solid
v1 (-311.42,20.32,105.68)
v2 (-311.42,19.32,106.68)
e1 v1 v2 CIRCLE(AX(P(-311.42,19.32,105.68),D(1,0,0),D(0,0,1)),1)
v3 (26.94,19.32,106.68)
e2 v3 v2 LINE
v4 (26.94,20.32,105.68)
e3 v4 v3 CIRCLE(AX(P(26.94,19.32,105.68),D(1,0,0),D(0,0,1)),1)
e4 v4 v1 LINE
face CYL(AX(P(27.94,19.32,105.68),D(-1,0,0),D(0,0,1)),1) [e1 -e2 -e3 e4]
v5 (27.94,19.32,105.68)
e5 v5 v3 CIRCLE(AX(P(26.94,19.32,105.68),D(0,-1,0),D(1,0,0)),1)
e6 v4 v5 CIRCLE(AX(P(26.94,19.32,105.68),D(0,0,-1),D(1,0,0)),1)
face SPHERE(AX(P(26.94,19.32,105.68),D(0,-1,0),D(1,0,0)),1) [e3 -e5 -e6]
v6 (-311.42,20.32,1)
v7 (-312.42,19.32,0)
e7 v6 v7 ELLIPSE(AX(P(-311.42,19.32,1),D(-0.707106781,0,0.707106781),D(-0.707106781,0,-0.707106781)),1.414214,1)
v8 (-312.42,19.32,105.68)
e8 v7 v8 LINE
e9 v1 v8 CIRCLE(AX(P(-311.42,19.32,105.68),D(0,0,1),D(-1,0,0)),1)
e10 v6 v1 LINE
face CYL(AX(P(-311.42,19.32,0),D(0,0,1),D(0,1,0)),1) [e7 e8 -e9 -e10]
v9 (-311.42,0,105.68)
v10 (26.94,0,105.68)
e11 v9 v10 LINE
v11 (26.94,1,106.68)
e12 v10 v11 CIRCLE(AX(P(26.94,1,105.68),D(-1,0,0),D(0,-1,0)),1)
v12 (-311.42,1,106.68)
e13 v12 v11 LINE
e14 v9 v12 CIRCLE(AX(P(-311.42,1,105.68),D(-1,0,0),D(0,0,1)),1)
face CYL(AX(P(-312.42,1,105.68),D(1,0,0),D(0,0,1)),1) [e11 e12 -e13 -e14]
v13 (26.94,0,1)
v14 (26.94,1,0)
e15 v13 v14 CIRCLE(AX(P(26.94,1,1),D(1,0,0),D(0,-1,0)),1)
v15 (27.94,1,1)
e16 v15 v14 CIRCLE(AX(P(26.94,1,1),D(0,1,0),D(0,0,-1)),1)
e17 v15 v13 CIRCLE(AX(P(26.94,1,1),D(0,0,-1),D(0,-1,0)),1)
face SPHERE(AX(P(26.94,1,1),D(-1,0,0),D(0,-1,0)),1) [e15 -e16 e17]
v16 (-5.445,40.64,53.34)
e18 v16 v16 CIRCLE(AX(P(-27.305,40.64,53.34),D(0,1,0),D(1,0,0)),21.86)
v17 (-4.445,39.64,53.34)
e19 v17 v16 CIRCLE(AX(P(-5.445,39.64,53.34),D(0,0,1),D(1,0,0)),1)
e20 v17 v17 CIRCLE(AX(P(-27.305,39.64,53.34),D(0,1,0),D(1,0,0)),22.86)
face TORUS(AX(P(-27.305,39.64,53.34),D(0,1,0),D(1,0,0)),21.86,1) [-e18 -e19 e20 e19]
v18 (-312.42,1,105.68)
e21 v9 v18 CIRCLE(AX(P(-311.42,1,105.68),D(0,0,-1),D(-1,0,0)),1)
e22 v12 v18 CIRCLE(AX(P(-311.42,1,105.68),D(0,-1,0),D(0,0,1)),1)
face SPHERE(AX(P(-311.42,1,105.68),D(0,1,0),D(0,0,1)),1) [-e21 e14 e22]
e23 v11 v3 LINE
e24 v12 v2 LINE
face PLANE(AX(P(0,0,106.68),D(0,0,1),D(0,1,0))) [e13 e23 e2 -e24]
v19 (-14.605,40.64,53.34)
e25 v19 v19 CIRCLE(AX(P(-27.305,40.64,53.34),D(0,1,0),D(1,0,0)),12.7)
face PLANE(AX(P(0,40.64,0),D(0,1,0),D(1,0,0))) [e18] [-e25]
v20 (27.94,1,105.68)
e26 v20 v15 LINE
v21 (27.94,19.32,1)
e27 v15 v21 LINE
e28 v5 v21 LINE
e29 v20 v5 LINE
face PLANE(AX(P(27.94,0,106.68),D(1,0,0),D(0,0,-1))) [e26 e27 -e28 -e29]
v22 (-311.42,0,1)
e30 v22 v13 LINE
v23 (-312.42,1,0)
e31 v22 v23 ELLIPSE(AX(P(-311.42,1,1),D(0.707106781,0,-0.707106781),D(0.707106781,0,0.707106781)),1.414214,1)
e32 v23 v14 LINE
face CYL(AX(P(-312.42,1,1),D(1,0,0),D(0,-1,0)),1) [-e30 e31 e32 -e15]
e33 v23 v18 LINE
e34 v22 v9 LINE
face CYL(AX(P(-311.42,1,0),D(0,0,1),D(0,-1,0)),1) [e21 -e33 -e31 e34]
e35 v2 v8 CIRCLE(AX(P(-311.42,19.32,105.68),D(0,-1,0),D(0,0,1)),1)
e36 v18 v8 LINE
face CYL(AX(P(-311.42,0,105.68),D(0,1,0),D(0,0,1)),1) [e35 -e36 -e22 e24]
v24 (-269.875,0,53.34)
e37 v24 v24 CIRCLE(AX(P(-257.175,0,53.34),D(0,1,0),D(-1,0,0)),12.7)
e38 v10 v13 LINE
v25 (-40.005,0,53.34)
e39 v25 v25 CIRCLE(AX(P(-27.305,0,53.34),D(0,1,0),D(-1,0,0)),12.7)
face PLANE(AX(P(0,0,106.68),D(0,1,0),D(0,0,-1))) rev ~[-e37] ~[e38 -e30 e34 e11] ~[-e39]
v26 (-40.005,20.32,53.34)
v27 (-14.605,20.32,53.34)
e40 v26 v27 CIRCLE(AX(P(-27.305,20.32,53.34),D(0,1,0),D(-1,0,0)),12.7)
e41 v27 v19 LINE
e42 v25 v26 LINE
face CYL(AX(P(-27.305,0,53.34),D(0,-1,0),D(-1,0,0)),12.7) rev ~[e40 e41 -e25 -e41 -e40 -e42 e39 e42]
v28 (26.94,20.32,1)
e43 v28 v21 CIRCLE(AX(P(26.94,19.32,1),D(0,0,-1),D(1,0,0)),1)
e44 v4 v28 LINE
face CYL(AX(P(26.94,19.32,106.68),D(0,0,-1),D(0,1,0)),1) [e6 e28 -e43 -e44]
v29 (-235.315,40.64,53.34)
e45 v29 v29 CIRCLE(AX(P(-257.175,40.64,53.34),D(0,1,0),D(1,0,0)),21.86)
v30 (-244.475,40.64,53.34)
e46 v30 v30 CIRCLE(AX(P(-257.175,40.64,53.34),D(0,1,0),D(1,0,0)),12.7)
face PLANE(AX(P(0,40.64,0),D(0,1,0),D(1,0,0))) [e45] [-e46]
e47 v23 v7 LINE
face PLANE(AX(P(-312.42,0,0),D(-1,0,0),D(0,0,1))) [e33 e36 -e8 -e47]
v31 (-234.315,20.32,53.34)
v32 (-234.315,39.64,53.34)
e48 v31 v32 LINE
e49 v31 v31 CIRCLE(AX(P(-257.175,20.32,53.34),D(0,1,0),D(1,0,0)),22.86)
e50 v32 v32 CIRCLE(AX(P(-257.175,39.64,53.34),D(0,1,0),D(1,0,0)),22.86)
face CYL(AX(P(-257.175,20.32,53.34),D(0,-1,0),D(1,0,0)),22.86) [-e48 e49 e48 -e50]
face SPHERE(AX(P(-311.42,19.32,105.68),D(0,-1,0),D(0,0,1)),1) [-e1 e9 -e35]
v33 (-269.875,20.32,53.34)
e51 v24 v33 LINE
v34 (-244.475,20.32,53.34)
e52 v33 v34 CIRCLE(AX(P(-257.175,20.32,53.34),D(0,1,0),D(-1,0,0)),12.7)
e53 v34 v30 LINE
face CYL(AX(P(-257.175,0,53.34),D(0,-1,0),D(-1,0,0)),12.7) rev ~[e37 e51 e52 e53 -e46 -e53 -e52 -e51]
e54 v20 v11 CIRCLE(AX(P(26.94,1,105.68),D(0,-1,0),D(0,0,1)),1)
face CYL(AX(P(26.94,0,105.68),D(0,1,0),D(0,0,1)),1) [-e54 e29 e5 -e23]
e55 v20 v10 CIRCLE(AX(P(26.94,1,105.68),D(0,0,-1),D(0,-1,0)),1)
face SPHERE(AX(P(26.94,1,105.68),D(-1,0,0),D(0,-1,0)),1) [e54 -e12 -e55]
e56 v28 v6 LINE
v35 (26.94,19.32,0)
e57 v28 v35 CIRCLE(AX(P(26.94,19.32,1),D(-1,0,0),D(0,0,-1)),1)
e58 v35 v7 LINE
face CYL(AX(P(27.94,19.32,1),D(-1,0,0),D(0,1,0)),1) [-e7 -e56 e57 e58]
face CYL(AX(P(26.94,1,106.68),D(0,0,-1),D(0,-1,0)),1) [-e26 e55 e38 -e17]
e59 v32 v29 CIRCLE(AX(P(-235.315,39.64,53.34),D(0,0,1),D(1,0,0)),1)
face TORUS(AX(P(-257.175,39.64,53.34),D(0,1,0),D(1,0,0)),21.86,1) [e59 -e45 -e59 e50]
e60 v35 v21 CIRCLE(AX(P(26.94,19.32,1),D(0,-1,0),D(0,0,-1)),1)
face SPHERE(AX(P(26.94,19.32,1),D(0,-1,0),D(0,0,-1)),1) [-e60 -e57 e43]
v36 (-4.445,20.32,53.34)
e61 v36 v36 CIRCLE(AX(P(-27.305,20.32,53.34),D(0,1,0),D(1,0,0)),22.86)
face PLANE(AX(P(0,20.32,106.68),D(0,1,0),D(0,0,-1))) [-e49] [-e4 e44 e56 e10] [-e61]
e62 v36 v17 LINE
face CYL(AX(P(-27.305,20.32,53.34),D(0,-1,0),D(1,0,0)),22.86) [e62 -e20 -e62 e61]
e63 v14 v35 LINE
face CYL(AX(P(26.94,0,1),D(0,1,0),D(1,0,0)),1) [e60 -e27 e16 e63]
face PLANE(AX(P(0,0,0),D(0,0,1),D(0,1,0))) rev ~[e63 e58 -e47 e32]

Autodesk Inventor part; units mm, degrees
ref_plane "YZ Plane" through (0, 0, 0) normal (1, 0, 0) x (0, 1, 0)
ref_plane "XZ Plane" through (0, 0, 0) normal (0, 1, 0) x (-1, 0, 0)
ref_plane "XY Plane" through (0, 0, 0) normal (0, 0, 1) x (1, 0, 0)
sketch "Sketch1" plane through (0, 0, 0) normal (0, 1, 0) x (-1, 0, 0)
  line L0 (0, 0) -> (284.48, 0)
  line L1 (284.48, 0) -> (284.48, 106.68)
  line L2 (284.48, 106.68) -> (0, 106.68)
  line L3 (0, 106.68) -> (0, 0)
  line L4 (0, 53.34) -> (27.305, 53.34) construction
  line L5 (284.48, 53.34) -> (257.175, 53.34) construction
  circle A0 centre (27.305, 53.34) radius 12.7
  circle A1 centre (257.175, 53.34) radius 12.7
  dimension "d0" = 284.48
  dimension "d1" = 106.68
  dimension "d2" = 27.305
  dimension "d3" = 27.305
  dimension "d4" = 25.4
  dimension "d5" = 25.4
extrude "Extrusion1" add sketch "Sketch1" along normal blind 20.32
sketch "Sketch2" plane through (0, 20.32, 0) normal (0, 1, 0) x (1, 0, 0)
  circle A0 centre (-257.175, -53.34) radius 12.7 projected
  circle A1 centre (-27.305, -53.34) radius 12.7 projected
  circle A2 centre (-257.175, -53.34) radius 22.86
  circle A3 centre (-27.305, -53.34) radius 22.86
  dimension "d8" = 45.72
  dimension "d9" = 45.72
extrude "Extrusion2" add sketch "Sketch2" along normal blind 20.32
sketch "Sketch3" plane through (-284.48, 0, 0) normal (-1, 0, 0) x (0, 0, 1)
  line L0 (0, 0) -> (106.68, 0) projected
  line L1 (106.68, 0) -> (106.68, 20.32) projected
  line L2 (0, 20.32) -> (106.68, 20.32) projected
  line L3 (0, 0) -> (0, 20.32) projected
extrude "Extrusion3" add sketch "Sketch3" along normal blind 27.94
sketch "Sketch4" plane through (0, 0, 106.68) normal (1, 0, 0) x (0, 0, -1)
  line L0 (0, 0) -> (106.68, 0) projected
  line L1 (106.68, 0) -> (106.68, 20.32) projected
  line L2 (0, 20.32) -> (106.68, 20.32) projected
  line L3 (0, 0) -> (0, 20.32) projected
extrude "Extrusion4" add sketch "Sketch4" along normal blind 27.94
fillet "Fillet1" radius 1 13 edges at (-312.42, 10.16, 106.68) (-142.24, 0, 106.68) (-142.24, 0, 0) (-312.42, 0, 53.34) (27.94, 0, 53.34) (27.94, 10.16, 106.68) (27.94, 10.16, 0) (-142.24, 20.32, 0) (27.94, 20.32, 53.34) (-142.24, 20.32, 106.68) (-312.42, 20.32, 53.34) (-280.035, 40.64, 53.34) (-50.165, 40.64, 53.34)
equation "\"d2\" = d3"
properties part number "CIM MountBase" material "Aluminum 6061, Welded"
